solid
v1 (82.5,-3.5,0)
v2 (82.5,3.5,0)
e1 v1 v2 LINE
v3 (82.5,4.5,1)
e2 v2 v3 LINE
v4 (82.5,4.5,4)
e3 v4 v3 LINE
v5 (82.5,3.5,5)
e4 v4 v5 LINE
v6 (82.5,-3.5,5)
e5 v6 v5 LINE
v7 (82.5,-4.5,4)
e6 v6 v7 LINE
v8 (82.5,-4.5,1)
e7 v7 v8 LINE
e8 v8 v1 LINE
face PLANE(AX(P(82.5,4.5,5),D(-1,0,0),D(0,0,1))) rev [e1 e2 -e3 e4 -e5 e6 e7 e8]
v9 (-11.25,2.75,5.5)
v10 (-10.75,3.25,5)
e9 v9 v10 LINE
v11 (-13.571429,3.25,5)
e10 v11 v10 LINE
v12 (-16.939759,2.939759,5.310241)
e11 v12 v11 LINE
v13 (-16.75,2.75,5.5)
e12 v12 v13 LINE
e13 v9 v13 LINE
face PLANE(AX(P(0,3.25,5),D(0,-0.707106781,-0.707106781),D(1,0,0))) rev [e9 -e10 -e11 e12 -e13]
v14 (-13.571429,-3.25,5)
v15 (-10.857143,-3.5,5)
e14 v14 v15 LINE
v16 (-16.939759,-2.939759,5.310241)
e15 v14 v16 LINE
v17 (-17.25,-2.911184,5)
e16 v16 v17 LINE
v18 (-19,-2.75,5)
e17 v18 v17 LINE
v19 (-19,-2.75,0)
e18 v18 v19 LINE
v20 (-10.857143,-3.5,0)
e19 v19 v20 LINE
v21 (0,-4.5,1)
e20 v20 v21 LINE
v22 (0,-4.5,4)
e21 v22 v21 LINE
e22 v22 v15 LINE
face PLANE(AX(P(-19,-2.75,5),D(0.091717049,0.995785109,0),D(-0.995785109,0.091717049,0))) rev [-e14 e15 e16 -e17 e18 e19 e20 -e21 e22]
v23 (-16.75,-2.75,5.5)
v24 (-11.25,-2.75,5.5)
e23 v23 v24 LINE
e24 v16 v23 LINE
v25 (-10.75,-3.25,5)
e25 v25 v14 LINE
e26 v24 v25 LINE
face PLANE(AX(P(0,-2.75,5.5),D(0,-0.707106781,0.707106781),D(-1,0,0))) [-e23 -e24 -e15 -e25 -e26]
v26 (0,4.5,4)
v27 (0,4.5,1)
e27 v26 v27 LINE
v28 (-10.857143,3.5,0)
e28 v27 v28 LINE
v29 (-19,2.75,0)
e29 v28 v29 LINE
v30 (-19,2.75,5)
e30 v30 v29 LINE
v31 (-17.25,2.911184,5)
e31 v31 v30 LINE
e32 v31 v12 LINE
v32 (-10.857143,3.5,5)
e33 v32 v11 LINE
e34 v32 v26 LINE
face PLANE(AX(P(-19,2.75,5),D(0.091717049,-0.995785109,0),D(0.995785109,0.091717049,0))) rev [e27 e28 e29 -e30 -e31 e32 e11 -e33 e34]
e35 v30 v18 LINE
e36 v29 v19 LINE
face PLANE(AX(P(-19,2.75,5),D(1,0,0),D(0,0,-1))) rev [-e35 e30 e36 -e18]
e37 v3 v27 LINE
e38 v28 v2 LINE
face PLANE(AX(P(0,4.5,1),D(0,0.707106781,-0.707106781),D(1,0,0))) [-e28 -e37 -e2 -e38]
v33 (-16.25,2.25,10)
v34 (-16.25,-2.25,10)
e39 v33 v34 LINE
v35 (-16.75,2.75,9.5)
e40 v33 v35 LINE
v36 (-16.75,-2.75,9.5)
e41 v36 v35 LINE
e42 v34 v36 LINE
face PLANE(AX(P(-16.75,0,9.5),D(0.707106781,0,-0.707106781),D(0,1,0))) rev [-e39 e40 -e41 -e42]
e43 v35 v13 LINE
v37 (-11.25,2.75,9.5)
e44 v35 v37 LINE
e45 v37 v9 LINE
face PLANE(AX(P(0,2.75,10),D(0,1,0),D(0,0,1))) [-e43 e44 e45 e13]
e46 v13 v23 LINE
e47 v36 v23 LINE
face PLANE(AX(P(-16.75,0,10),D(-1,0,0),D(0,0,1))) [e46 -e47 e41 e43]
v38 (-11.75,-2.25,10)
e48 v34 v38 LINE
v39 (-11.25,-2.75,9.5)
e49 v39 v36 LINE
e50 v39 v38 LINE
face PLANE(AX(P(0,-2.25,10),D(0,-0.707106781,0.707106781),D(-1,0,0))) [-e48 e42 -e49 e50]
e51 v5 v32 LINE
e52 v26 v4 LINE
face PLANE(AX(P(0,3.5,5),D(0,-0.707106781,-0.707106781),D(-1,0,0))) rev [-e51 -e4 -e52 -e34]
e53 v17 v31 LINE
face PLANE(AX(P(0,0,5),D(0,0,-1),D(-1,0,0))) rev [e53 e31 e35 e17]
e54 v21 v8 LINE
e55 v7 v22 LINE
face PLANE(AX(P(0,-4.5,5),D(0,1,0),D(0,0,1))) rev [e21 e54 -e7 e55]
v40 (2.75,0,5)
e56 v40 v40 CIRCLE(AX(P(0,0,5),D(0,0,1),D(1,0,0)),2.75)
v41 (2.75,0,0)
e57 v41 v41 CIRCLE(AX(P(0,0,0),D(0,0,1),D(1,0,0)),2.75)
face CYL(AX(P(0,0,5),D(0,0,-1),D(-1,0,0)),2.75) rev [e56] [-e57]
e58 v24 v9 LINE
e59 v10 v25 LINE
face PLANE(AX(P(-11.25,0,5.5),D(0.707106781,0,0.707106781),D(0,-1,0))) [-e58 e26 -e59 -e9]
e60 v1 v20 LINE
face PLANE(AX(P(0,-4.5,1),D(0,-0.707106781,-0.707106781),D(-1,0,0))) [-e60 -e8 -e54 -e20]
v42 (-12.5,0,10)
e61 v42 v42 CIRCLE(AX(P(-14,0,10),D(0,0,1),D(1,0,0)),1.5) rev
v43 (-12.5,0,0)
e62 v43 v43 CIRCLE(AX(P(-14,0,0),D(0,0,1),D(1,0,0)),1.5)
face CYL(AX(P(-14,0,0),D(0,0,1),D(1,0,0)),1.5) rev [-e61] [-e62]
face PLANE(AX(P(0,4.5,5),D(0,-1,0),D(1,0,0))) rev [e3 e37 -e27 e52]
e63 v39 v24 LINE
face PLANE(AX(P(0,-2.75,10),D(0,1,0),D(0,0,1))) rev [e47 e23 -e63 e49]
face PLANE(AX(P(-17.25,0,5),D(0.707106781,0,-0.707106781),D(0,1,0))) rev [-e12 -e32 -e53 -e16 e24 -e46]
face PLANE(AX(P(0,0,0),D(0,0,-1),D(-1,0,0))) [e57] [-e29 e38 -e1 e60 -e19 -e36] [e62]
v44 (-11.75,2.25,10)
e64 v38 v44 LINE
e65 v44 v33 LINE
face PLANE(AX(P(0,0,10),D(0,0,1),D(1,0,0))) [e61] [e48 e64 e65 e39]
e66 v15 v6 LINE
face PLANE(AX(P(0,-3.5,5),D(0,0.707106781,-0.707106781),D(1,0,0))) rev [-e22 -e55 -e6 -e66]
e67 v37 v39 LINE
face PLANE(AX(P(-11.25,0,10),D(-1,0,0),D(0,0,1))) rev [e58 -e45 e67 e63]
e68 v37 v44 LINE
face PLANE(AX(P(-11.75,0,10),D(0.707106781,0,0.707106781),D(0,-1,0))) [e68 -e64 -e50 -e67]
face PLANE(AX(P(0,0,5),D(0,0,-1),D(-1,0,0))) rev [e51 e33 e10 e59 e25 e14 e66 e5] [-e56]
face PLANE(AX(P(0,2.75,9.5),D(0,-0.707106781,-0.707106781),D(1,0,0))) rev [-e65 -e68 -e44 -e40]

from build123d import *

# Parameters (mm, degrees)
SKETCH1_R           = 2.75
BOSS_EXTRUDE1_DEPTH = 5
CHAMFER1_SIZE       = 1
SKETCH2_R           = 1.5
CUT_EXTRUDE1_DEPTH  = 83.773788122
BOSS_EXTRUDE2_START = 5
SKETCH3_W           = 5.5
SKETCH3_H           = 5.5
SKETCH3_W_2         = 3
SKETCH3_H_2         = 3
BOSS_EXTRUDE2_DEPTH = 5
CHAMFER3_SIZE       = 0.5


with BuildPart() as part:
    # Sketch1 → Boss-Extrude1 (new body)
    with BuildSketch(Plane.XY):
        Polygon((82.5, 4.5), (82.5, -4.5), (0, -4.5), (-19, -2.75), (-19, 2.75), (0, 4.5), align=None)
        Circle(SKETCH1_R, mode=Mode.SUBTRACT)
    extrude(amount=BOSS_EXTRUDE1_DEPTH)

    # Chamfer1
    # the kernel refuses this chamfer: 1 mm, written as the material it takes off along each edge
    with BuildSketch(Plane(origin=(-12.85841494, 4.5, 5), x_dir=(0, 0, -1), z_dir=(1, 0, 0)), Plane(origin=(85.071682988, -4.5, 5), x_dir=(0, 0, -1), z_dir=(-1, 0, 0))) as chamfer1_piece_1:
        Polygon((CHAMFER1_SIZE, 0), (0, -CHAMFER1_SIZE), (0, 0), align=None)
    extrude(amount=97.930097928, mode=Mode.SUBTRACT)
    with BuildSketch(Plane(origin=(-12.85841494, 4.5, 0), x_dir=(0, 0, 1), z_dir=(1, 0, 0)), Plane(origin=(85.071682988, -4.5, 0), x_dir=(0, 0, 1), z_dir=(-1, 0, 0))) as chamfer1_piece_2:
        Polygon((CHAMFER1_SIZE, 0), (0, CHAMFER1_SIZE), (0, 0), align=None)
    extrude(amount=97.930097928, mode=Mode.SUBTRACT)

    # Sketch2 → Cut-Extrude1 (cut, through all)
    with BuildSketch(Plane.XY.offset(5)):
        with Locations((-14, 0)):
            Circle(SKETCH2_R)
    extrude(amount=-CUT_EXTRUDE1_DEPTH, mode=Mode.SUBTRACT)

    # Sketch3 → Boss-Extrude2 (add)
    # profile 1 of 5: a face of its own
    with BuildSketch(Plane.XY.offset(5).offset(BOSS_EXTRUDE2_START)):
        with Locations((-14, 0)):
            Rectangle(SKETCH3_W, SKETCH3_H)
        with Locations((-14, 0)):
            Rectangle(SKETCH3_W_2, SKETCH3_H_2, mode=Mode.SUBTRACT)
    # profile 2 of 5: a face of its own
    with BuildSketch(Plane.XY.offset(5).offset(BOSS_EXTRUDE2_START)):
        with BuildLine():
            Line((-15.5, 1.5), (-15.5, 3e-09))
            ThreePointArc((-15.5, 3e-09), (-15.060660171, 1.060660173), (-14, 1.5))
            Line((-14, 1.5), (-15.5, 1.5))
        make_face()
    # profile 3 of 5: a face of its own
    with BuildSketch(Plane.XY.offset(5).offset(BOSS_EXTRUDE2_START)):
        with BuildLine():
            Line((-15.5, 3e-09), (-15.5, -1.5))
            Line((-15.5, -1.5), (-14, -1.5))
            ThreePointArc((-14, -1.5), (-15.060660173, -1.060660171), (-15.5, 3e-09))
        make_face()
    # profile 4 of 5: a face of its own
    with BuildSketch(Plane.XY.offset(5).offset(BOSS_EXTRUDE2_START)):
        with BuildLine():
            ThreePointArc((-12.5, 0), (-12.939339828, -1.060660172), (-14, -1.5))
            Line((-14, -1.5), (-12.5, -1.5))
            Line((-12.5, -1.5), (-12.5, 0))
        make_face()
    # profile 5 of 5: a face of its own
    with BuildSketch(Plane.XY.offset(5).offset(BOSS_EXTRUDE2_START)):
        with BuildLine():
            ThreePointArc((-14, 1.5), (-12.939339828, 1.060660172), (-12.5, 0))
            Line((-12.5, 0), (-12.5, 1.5))
            Line((-12.5, 1.5), (-14, 1.5))
        make_face()
    extrude(amount=-BOSS_EXTRUDE2_DEPTH)

    # Chamfer3
    # the kernel refuses this chamfer: 0.5 mm, written as the material it adds along each edge
    with BuildSketch(Plane(origin=(-16.75, -2.75, 5), x_dir=(0, -1, 0), z_dir=(1, 0, 0))) as chamfer3_piece_1_section:
        Polygon((CHAMFER3_SIZE, 0), (0, -CHAMFER3_SIZE), (0, 0), align=None)
    chamfer3_piece_1 = extrude(amount=5.5, mode=Mode.PRIVATE)
    chamfer3_piece_1 = split(chamfer3_piece_1, bisect_by=Plane(origin=(-16.768927039, -2.955493562, 5), z_dir=(0.09171704949125846, 0.995785108762236, 0)), keep=Keep.TOP, mode=Mode.PRIVATE)
    add(chamfer3_piece_1)
    with BuildSketch(Plane(origin=(-11.25, -2.75, 5), x_dir=(1, 0, 0), z_dir=(0, 1, 0)), Plane(origin=(-16.75, 2.75, 5), x_dir=(-1, 0, 0), z_dir=(0, -1, 0))) as chamfer3_piece_2:
        Polygon((CHAMFER3_SIZE, 0), (0, -CHAMFER3_SIZE), (0, 0), align=None)
    extrude(amount=5.5)
    with BuildSketch(Plane(origin=(-11.25, 2.75, 5), x_dir=(0, 1, 0), z_dir=(-1, 0, 0))) as chamfer3_piece_3_section:
        Polygon((CHAMFER3_SIZE, 0), (0, -CHAMFER3_SIZE), (0, 0), align=None)
    chamfer3_piece_3 = extrude(amount=5.5, mode=Mode.PRIVATE)
    chamfer3_piece_3 = split(chamfer3_piece_3, bisect_by=Plane(origin=(-11.315193133, 3.457811159, 5), z_dir=(0.09171704949125607, -0.9957851087622361, 0)), keep=Keep.TOP, mode=Mode.PRIVATE)
    add(chamfer3_piece_3)
    with BuildSketch(Plane(origin=(-16.75, 2.75, 5), x_dir=(-1, 0, 0), z_dir=(0, -1, 0))) as chamfer3_piece_4a_section:
        Polygon((CHAMFER3_SIZE, 0), (0, -CHAMFER3_SIZE), (0, 0), align=None)
    chamfer3_piece_4a = extrude(amount=6.785841494, mode=Mode.PRIVATE)
    chamfer3_piece_4a = split(chamfer3_piece_4a, bisect_by=Plane(origin=(-17.271244635, -2.909227468, 5), z_dir=(0.09171704949125846, 0.995785108762236, 0)), keep=Keep.TOP, mode=Mode.PRIVATE)
    chamfer3_piece_4a = split(chamfer3_piece_4a, bisect_by=Plane(origin=(-16.75, -2.75, 5), z_dir=(0, -1, 0)), keep=Keep.TOP, mode=Mode.PRIVATE)
    with BuildSketch(Plane(origin=(-18.035841494, -2.75, 5), x_dir=(0, -1, 0), z_dir=(1, 0, 0))) as chamfer3_piece_4b_section:
        Polygon((CHAMFER3_SIZE, 0), (0, -CHAMFER3_SIZE), (0, 0), align=None)
    chamfer3_piece_4b = extrude(amount=6.785841494, mode=Mode.PRIVATE)
    chamfer3_piece_4b = split(chamfer3_piece_4b, bisect_by=Plane(origin=(-18.043952012, -2.838057052, 5), z_dir=(0.09171704949125846, 0.995785108762236, 0)), keep=Keep.TOP, mode=Mode.PRIVATE)
    chamfer3_piece_4b = split(chamfer3_piece_4b, bisect_by=Plane(origin=(-16.75, -2.75, 5), z_dir=(-1, 0, 0)), keep=Keep.TOP, mode=Mode.PRIVATE)
    chamfer3_piece_4 = chamfer3_piece_4a & chamfer3_piece_4b
    add(chamfer3_piece_4)
    with BuildSketch(Plane(origin=(-11.25, -4.035841494, 5), x_dir=(1, 0, 0), z_dir=(0, 1, 0))) as chamfer3_piece_5a_section:
        Polygon((CHAMFER3_SIZE, 0), (0, -CHAMFER3_SIZE), (0, 0), align=None)
    chamfer3_piece_5a = extrude(amount=6.785841494, mode=Mode.PRIVATE)
    chamfer3_piece_5a = split(chamfer3_piece_5a, bisect_by=Plane(origin=(-11.25, -3.767920747, 4.732079253), z_dir=(0, 0.7071067811865476, -0.7071067811865476)), keep=Keep.TOP, mode=Mode.PRIVATE)
    chamfer3_piece_5a = split(chamfer3_piece_5a, bisect_by=Plane(origin=(-11.197756622, -3.46862768, 5), z_dir=(0.09171704949125846, 0.995785108762236, 0)), keep=Keep.TOP, mode=Mode.PRIVATE)
    chamfer3_piece_5a = split(chamfer3_piece_5a, bisect_by=Plane(origin=(-11.25, -2.75, 5), z_dir=(0, -1, 0)), keep=Keep.TOP, mode=Mode.PRIVATE)
    with BuildSketch(Plane(origin=(-16.75, -2.75, 5), x_dir=(0, -1, 0), z_dir=(1, 0, 0))) as chamfer3_piece_5b_section:
        Polygon((CHAMFER3_SIZE, 0), (0, -CHAMFER3_SIZE), (0, 0), align=None)
    chamfer3_piece_5b = extrude(amount=6.785841494, mode=Mode.PRIVATE)
    chamfer3_piece_5b = split(chamfer3_piece_5b, bisect_by=Plane(origin=(-11.25, -2.75, 5), z_dir=(1, 0, 0)), keep=Keep.TOP, mode=Mode.PRIVATE)
    chamfer3_piece_5 = chamfer3_piece_5a & chamfer3_piece_5b
    add(chamfer3_piece_5)
    with BuildSketch(Plane(origin=(-9.964158506, 2.75, 5), x_dir=(0, 1, 0), z_dir=(-1, 0, 0))) as chamfer3_piece_6a_section:
        Polygon((CHAMFER3_SIZE, 0), (0, -CHAMFER3_SIZE), (0, 0), align=None)
    chamfer3_piece_6a = extrude(amount=6.785841494, mode=Mode.PRIVATE)
    chamfer3_piece_6a = split(chamfer3_piece_6a, bisect_by=Plane(origin=(-11.25, 2.75, 5), z_dir=(1, 0, 0)), keep=Keep.TOP, mode=Mode.PRIVATE)
    with BuildSketch(Plane(origin=(-11.25, -2.75, 5), x_dir=(1, 0, 0), z_dir=(0, 1, 0))) as chamfer3_piece_6b_section:
        Polygon((CHAMFER3_SIZE, 0), (0, -CHAMFER3_SIZE), (0, 0), align=None)
    chamfer3_piece_6b = extrude(amount=6.785841494, mode=Mode.PRIVATE)
    chamfer3_piece_6b = split(chamfer3_piece_6b, bisect_by=Plane(origin=(-11.25, 0.375, 8.125), z_dir=(0, -0.7071067811865476, -0.7071067811865476)), keep=Keep.TOP, mode=Mode.PRIVATE)
    chamfer3_piece_6b = split(chamfer3_piece_6b, bisect_by=Plane(origin=(-11.81751073, 3.411545064, 5), z_dir=(0.09171704949125607, -0.9957851087622361, 0)), keep=Keep.TOP, mode=Mode.PRIVATE)
    chamfer3_piece_6b = split(chamfer3_piece_6b, bisect_by=Plane(origin=(-11.25, 2.75, 5), z_dir=(0, 1, 0)), keep=Keep.TOP, mode=Mode.PRIVATE)
    chamfer3_piece_6 = chamfer3_piece_6a & chamfer3_piece_6b
    add(chamfer3_piece_6)
    with BuildSketch(Plane(origin=(-16.75, 4.035841494, 5), x_dir=(-1, 0, 0), z_dir=(0, -1, 0))) as chamfer3_piece_7a_section:
        Polygon((CHAMFER3_SIZE, 0), (0, -CHAMFER3_SIZE), (0, 0), align=None)
    chamfer3_piece_7a = extrude(amount=6.785841494, mode=Mode.PRIVATE)
    chamfer3_piece_7a = split(chamfer3_piece_7a, bisect_by=Plane(origin=(-16.651490528, 2.966310083, 5), z_dir=(0.09171704949125607, -0.9957851087622361, 0)), keep=Keep.TOP, mode=Mode.PRIVATE)
    chamfer3_piece_7a = split(chamfer3_piece_7a, bisect_by=Plane(origin=(-16.75, 2.75, 5), z_dir=(0, 1, 0)), keep=Keep.TOP, mode=Mode.PRIVATE)
    with BuildSketch(Plane(origin=(-11.25, 2.75, 5), x_dir=(0, 1, 0), z_dir=(-1, 0, 0))) as chamfer3_piece_7b_section:
        Polygon((CHAMFER3_SIZE, 0), (0, -CHAMFER3_SIZE), (0, 0), align=None)
    chamfer3_piece_7b = extrude(amount=6.785841494, mode=Mode.PRIVATE)
    chamfer3_piece_7b = split(chamfer3_piece_7b, bisect_by=Plane(origin=(-11.315193133, 3.457811159, 5), z_dir=(0.09171704949125607, -0.9957851087622361, 0)), keep=Keep.TOP, mode=Mode.PRIVATE)
    chamfer3_piece_7b = split(chamfer3_piece_7b, bisect_by=Plane(origin=(-16.75, 2.75, 5), z_dir=(-1, 0, 0)), keep=Keep.TOP, mode=Mode.PRIVATE)
    chamfer3_piece_7 = chamfer3_piece_7a & chamfer3_piece_7b
    add(chamfer3_piece_7)
    # the kernel refuses this chamfer: 0.5 mm, written as the material it takes off along each edge
    with BuildSketch(Plane(origin=(-9.964158506, 2.75, 10), x_dir=(0, 0, -1), z_dir=(-1, 0, 0)), Plane(origin=(-18.035841494, -2.75, 10), x_dir=(0, 0, -1), z_dir=(1, 0, 0)), Plane(origin=(-11.25, -4.035841494, 10), x_dir=(0, 0, -1), z_dir=(0, 1, 0))) as chamfer3_2_piece_1:
        Polygon((CHAMFER3_SIZE, 0), (0, CHAMFER3_SIZE), (0, 0), align=None)
    extrude(amount=8.071682988, mode=Mode.SUBTRACT)
    with BuildSketch(Plane(origin=(-16.75, 4.035841494, 10), x_dir=(1, 0, 0), z_dir=(0, -1, 0))) as chamfer3_2_piece_2:
        Polygon((CHAMFER3_SIZE, 0), (0, -CHAMFER3_SIZE), (0, 0), align=None)
    extrude(amount=8.071682988, mode=Mode.SUBTRACT)


solid = part.part
